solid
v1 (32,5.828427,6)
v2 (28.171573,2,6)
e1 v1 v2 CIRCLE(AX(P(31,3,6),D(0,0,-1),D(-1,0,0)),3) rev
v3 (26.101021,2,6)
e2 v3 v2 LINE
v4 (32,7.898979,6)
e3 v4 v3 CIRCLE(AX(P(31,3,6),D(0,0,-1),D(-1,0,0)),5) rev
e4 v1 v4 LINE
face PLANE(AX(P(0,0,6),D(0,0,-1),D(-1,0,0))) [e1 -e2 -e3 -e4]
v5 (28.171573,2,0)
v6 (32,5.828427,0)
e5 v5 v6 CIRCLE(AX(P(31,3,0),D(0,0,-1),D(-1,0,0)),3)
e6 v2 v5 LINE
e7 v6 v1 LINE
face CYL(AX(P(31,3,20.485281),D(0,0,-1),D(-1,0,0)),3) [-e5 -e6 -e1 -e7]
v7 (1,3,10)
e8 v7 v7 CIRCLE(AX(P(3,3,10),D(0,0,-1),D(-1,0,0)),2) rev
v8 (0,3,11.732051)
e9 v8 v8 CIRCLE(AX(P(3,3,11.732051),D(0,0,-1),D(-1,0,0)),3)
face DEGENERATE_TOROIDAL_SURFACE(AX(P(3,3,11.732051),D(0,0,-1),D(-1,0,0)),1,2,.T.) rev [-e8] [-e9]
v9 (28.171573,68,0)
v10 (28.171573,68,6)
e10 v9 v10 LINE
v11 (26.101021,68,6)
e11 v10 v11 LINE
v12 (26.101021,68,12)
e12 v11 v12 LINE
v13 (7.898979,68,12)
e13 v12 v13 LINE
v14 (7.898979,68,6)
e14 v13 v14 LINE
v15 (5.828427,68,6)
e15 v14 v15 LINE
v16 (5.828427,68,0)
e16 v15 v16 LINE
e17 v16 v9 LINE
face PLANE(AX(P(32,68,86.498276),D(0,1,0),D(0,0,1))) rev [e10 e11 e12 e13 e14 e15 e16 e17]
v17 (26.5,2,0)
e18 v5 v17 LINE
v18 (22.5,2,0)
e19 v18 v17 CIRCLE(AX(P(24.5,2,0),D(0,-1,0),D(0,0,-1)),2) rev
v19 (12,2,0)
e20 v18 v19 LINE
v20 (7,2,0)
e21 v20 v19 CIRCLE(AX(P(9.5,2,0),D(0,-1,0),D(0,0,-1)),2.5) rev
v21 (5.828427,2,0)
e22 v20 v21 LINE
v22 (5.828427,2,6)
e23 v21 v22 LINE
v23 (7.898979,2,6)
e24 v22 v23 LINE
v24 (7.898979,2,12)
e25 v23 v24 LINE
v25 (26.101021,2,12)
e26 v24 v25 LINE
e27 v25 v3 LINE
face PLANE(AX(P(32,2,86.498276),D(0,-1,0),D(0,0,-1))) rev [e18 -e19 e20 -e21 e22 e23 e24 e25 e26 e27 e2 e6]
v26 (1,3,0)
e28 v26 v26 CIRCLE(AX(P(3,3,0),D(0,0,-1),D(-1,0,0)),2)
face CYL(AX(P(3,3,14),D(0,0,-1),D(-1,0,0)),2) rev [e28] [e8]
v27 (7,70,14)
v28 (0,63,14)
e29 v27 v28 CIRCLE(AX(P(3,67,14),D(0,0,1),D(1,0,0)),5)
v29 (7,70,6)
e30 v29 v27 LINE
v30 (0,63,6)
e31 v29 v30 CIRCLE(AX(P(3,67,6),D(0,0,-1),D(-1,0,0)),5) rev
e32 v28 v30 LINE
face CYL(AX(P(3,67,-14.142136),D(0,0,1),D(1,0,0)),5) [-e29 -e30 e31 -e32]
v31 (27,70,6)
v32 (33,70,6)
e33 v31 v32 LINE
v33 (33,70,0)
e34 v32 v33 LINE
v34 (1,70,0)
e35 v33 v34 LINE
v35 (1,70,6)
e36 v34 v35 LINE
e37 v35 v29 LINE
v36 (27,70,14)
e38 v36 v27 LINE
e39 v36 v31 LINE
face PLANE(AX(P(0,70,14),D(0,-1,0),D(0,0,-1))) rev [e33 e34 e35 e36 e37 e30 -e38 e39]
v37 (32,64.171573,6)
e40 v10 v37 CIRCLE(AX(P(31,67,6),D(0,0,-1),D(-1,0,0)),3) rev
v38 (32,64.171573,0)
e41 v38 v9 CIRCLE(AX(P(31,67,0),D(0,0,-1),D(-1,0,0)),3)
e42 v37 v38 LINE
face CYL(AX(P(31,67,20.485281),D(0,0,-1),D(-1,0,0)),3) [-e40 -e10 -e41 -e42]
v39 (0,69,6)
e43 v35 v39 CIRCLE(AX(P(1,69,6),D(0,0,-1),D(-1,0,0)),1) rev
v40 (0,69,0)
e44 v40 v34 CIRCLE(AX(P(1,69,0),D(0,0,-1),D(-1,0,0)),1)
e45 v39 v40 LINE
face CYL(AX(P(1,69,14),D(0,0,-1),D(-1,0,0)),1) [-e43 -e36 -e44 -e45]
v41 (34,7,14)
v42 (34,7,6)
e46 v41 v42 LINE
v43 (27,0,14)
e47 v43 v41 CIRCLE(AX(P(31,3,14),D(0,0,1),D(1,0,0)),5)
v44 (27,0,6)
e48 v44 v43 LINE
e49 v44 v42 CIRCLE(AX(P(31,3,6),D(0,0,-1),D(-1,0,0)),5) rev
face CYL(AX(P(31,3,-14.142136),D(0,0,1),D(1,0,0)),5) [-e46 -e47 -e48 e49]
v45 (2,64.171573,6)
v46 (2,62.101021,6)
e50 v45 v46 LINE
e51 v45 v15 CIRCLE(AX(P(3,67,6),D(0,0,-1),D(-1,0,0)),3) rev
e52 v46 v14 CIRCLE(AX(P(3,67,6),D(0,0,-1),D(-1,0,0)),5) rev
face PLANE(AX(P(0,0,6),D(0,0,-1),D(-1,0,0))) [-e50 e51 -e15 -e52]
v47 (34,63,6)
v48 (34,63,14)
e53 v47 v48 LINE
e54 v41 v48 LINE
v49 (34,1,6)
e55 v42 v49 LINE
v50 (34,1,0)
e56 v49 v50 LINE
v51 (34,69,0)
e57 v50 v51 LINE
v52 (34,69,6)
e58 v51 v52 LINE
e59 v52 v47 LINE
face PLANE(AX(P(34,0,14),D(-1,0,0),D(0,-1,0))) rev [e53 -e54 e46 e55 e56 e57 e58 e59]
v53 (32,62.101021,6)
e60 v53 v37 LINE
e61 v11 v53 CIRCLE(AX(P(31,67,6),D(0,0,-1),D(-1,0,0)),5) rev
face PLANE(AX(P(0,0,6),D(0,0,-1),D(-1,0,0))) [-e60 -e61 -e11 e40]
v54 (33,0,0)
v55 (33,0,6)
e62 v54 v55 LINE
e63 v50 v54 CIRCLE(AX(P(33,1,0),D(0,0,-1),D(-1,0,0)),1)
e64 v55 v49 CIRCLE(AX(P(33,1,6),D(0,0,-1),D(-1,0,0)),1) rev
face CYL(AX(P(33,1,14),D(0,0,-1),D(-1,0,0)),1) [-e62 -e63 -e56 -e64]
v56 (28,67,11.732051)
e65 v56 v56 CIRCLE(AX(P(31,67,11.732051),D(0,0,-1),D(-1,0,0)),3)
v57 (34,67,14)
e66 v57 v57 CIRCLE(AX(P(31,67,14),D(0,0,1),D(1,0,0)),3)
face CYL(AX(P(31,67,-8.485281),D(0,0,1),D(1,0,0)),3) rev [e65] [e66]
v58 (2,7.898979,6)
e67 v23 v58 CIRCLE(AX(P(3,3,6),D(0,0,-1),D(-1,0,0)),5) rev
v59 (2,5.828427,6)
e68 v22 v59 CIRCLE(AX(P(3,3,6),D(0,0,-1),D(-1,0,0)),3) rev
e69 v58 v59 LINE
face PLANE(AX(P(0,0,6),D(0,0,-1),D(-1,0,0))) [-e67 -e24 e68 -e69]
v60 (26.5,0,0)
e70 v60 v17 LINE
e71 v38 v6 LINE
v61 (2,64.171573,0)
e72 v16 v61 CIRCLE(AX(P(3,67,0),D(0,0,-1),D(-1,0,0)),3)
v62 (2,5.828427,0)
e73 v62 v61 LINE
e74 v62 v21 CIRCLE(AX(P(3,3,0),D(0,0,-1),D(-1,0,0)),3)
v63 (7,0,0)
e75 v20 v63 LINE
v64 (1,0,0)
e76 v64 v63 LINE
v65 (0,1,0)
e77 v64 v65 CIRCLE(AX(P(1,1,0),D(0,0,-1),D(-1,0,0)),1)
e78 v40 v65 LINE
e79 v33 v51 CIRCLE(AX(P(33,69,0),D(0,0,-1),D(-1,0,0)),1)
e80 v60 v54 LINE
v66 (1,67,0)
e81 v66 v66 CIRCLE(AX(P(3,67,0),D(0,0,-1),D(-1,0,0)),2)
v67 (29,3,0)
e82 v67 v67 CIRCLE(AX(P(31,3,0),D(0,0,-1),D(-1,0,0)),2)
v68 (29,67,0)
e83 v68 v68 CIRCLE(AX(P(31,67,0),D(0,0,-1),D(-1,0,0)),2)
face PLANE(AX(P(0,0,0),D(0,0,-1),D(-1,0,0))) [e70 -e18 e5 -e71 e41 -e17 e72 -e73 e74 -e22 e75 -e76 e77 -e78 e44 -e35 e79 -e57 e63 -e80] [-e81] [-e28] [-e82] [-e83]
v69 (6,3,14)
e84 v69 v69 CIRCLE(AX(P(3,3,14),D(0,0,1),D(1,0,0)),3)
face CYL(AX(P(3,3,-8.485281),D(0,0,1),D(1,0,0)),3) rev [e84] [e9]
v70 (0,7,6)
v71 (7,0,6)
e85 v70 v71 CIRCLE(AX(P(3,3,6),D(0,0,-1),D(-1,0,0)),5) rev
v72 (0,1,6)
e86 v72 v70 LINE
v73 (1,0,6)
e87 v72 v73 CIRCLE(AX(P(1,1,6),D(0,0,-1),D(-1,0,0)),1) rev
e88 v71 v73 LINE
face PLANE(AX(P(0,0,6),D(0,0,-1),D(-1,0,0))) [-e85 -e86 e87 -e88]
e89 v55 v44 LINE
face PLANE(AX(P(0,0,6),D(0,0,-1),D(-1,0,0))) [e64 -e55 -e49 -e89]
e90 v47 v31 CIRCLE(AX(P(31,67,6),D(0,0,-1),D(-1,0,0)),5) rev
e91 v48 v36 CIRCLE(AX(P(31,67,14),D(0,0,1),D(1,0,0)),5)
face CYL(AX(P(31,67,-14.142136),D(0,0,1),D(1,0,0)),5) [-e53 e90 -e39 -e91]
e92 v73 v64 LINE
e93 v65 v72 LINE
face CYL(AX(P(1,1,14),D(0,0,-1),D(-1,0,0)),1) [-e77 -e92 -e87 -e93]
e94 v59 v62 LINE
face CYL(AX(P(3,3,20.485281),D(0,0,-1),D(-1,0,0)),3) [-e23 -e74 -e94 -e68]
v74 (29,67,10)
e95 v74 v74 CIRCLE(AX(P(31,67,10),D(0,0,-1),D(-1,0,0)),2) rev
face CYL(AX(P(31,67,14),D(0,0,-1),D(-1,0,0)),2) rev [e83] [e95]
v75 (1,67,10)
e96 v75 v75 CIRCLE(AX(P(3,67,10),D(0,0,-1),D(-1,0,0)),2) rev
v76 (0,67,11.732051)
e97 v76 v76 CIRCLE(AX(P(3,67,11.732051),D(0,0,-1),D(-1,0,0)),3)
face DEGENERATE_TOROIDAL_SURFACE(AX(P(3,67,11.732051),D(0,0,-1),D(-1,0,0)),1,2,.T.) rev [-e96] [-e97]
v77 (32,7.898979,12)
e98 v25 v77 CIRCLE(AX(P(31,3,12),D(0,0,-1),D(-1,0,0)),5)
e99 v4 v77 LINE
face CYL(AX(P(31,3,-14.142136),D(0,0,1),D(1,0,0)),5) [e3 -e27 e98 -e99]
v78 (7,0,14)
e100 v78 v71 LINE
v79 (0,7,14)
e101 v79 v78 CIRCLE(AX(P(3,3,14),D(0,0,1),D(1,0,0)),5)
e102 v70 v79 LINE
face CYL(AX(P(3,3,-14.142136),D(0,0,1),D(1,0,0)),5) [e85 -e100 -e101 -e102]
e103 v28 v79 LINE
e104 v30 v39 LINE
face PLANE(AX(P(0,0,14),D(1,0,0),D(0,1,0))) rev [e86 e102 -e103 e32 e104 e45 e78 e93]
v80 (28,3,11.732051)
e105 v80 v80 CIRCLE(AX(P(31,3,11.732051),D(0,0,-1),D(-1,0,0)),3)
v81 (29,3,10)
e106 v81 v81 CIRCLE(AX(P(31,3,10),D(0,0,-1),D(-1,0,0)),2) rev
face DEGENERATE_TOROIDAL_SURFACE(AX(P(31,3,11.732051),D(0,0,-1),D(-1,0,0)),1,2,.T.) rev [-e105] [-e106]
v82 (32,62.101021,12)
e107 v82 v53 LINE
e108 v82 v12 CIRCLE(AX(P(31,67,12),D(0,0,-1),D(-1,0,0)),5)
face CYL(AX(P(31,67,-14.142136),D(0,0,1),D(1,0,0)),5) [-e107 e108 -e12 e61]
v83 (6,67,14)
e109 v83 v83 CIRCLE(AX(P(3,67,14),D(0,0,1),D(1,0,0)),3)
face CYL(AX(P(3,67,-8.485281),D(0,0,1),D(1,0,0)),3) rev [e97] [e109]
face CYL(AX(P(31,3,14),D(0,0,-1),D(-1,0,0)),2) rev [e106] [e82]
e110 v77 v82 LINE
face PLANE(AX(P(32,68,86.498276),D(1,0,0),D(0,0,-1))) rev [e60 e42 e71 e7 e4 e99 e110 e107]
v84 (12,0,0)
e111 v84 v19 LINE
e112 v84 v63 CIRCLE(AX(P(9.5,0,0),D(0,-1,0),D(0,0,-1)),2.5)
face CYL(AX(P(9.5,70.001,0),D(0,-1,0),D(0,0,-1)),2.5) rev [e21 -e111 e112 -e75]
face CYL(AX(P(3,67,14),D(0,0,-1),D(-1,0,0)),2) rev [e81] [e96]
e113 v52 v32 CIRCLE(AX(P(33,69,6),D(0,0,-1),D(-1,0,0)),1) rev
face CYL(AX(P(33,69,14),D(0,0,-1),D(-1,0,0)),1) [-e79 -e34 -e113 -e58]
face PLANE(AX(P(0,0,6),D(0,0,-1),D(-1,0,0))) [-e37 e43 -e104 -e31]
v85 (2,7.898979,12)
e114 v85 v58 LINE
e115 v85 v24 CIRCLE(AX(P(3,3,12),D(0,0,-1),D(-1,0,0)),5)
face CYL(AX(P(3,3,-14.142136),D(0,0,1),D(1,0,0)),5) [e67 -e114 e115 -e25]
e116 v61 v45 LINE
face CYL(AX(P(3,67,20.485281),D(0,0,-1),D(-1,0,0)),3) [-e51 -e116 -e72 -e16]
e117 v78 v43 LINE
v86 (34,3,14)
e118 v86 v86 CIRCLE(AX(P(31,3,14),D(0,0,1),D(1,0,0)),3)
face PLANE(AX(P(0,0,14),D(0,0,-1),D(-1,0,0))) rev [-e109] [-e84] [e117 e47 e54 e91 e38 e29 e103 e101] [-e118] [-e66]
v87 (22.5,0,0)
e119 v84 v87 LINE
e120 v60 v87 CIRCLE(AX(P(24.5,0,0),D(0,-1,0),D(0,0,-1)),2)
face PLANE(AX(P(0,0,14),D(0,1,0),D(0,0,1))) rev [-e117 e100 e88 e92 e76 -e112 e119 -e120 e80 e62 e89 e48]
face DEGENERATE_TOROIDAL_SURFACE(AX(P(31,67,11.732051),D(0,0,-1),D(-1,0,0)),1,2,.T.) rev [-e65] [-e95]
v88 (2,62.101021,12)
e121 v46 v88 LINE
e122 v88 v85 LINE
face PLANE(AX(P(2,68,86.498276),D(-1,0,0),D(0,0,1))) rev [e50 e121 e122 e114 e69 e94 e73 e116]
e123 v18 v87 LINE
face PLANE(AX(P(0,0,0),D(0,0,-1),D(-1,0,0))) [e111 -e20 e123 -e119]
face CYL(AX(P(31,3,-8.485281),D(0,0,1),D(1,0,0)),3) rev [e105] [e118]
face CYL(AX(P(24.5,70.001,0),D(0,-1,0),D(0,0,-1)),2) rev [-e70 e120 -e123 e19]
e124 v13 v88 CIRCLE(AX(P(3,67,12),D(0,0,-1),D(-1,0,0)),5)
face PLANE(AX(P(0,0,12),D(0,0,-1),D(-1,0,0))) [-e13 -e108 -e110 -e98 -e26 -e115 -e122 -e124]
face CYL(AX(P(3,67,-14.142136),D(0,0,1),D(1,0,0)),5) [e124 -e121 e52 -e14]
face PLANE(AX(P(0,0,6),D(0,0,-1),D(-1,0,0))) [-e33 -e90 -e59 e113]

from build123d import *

# Parameters (mm, degrees)
SKETCH1_W           = 34
SKETCH1_H           = 70
BOSS_EXTRUDE1_DEPTH = 14
SKETCH2_W           = 30
SKETCH2_H           = 66
CUT_EXTRUDE1_DEPTH  = 12
SKETCH3_R           = 3
BOSS_EXTRUDE2_DEPTH = 12
SKETCH4_R           = 2
CUT_EXTRUDE2_DEPTH  = 80.069589603
CUT_EXTRUDE4_REACH  = 81.07
SKETCH6_R           = 2.5
SKETCH6_R_2         = 2
FILLET1_R           = 1
BOSS_EXTRUDE3_START = -8
SKETCH7_R           = 5
SKETCH7_R_2         = 3
BOSS_EXTRUDE3_DEPTH = 8
CUT_EXTRUDE7_START  = -4
SKETCH8_R           = 3
CUT_EXTRUDE7_DEPTH  = 4
FILLET2_R           = 2


with BuildPart() as part:
    # Sketch1 → Boss-Extrude1 (new body)
    with BuildSketch(Plane.XY):
        with Locations((17, 35)):
            Rectangle(SKETCH1_W, SKETCH1_H)
    extrude(amount=BOSS_EXTRUDE1_DEPTH)

    # Sketch2 → Cut-Extrude1 (cut)
    with BuildSketch(Plane(origin=(0, 0, 0), x_dir=(-1, 0, 0), z_dir=(0, 0, -1))):
        with Locations((-17, 35)):
            Rectangle(SKETCH2_W, SKETCH2_H)
    extrude(amount=-CUT_EXTRUDE1_DEPTH, mode=Mode.SUBTRACT)

    # Sketch3 → Boss-Extrude2 (add)
    with BuildSketch(Plane(origin=(0, 0, 0), x_dir=(-1, 0, 0), z_dir=(0, 0, -1))):
        with Locations((-31, 67)):
            Circle(SKETCH3_R)
        with Locations((-3, 67)):
            Circle(SKETCH3_R)
        with Locations((-3, 3)):
            Circle(SKETCH3_R)
        with Locations((-31, 3)):
            Circle(SKETCH3_R)
    extrude(amount=-BOSS_EXTRUDE2_DEPTH)

    # Sketch4 → Cut-Extrude2 (cut, through all)
    with BuildSketch(Plane(origin=(0, 0, 0), x_dir=(-1, 0, 0), z_dir=(0, 0, -1))):
        with Locations((-3, 67)):
            Circle(SKETCH4_R)
        with Locations((-31, 67)):
            Circle(SKETCH4_R)
        with Locations((-3, 3)):
            Circle(SKETCH4_R)
        with Locations((-31, 3)):
            Circle(SKETCH4_R)
    extrude(amount=-CUT_EXTRUDE2_DEPTH, mode=Mode.SUBTRACT)

    # Sketch6 → Cut-Extrude4 (cut, up to next)
    with BuildSketch(Plane.XZ, mode=Mode.PRIVATE) as cut_extrude4_sk1:
        with Locations((9.5, 0)):
            Circle(SKETCH6_R)
    cut_extrude4_tool1 = extrude(cut_extrude4_sk1.sketch, amount=-CUT_EXTRUDE4_REACH, mode=Mode.PRIVATE) & part.part
    # Sketch6 → Cut-Extrude4 (cut, up to next)
    with BuildSketch(Plane.XZ, mode=Mode.PRIVATE) as cut_extrude4_sk2:
        with Locations((24.5, 0)):
            Circle(SKETCH6_R_2)
    cut_extrude4_tool2 = extrude(cut_extrude4_sk2.sketch, amount=-CUT_EXTRUDE4_REACH, mode=Mode.PRIVATE) & part.part
    add(cut_extrude4_tool1.solids().sort_by_distance((9.5, 0, 0))[0], mode=Mode.SUBTRACT)
    add(cut_extrude4_tool2.solids().sort_by_distance((24.5, 0, 0))[0], mode=Mode.SUBTRACT)

    # Fillet1
    fillet1_edges = [part.edges().sort_by_distance(p)[0] for p in [
        (0, 70, 7),
        (34, 70, 7),
        (34, 0, 7),
        (0, 0, 7),
    ]]
    fillet(fillet1_edges, radius=FILLET1_R)

    # Sketch7 → Boss-Extrude3 (add)
    # profile 1 of 4: a face of its own
    with BuildSketch(Plane.XY.offset(14).offset(BOSS_EXTRUDE3_START)):
        with Locations((31, 67)):
            Circle(SKETCH7_R)
        with Locations((31, 67)):
            Circle(SKETCH7_R_2, mode=Mode.SUBTRACT)
    # profile 2 of 4: a face of its own
    with BuildSketch(Plane.XY.offset(14).offset(BOSS_EXTRUDE3_START)):
        with Locations((3, 67)):
            Circle(SKETCH7_R)
        with Locations((3, 67)):
            Circle(SKETCH7_R_2, mode=Mode.SUBTRACT)
    # profile 3 of 4: a face of its own
    with BuildSketch(Plane.XY.offset(14).offset(BOSS_EXTRUDE3_START)):
        with Locations((31, 3)):
            Circle(SKETCH7_R)
        with Locations((31, 3)):
            Circle(SKETCH7_R_2, mode=Mode.SUBTRACT)
    # profile 4 of 4: a face of its own
    with BuildSketch(Plane.XY.offset(14).offset(BOSS_EXTRUDE3_START)):
        with Locations((3, 3)):
            Circle(SKETCH7_R)
        with Locations((3, 3)):
            Circle(SKETCH7_R_2, mode=Mode.SUBTRACT)
    extrude(amount=BOSS_EXTRUDE3_DEPTH)

    # Sketch8 → Cut-Extrude7 (cut)
    with BuildSketch(Plane.XY.offset(14).offset(CUT_EXTRUDE7_START)):
        with Locations((3, 3)):
            Circle(SKETCH8_R)
        with Locations((31, 3)):
            Circle(SKETCH8_R)
        with Locations((31, 67)):
            Circle(SKETCH8_R)
        with Locations((3, 67)):
            Circle(SKETCH8_R)
    extrude(amount=CUT_EXTRUDE7_DEPTH, mode=Mode.SUBTRACT)

    # Fillet2
    # the kernel refuses this fillet: 2 mm, written as the material it adds along each edge
    with BuildSketch(Plane(origin=(3, 67, 10), x_dir=(1, 0, 0), z_dir=(0, -1, 0))) as fillet2_piece_1_section:
        with BuildLine():
            CenterArc((1, 1.732050808), FILLET2_R, 300, 60)
            Line((2, 0), (2.02, -0.034641016))
            ThreePointArc((2.02, -0.034641016), (2.5, -0.04), (3, -0.04))
            Line((3, -0.04), (3.04, 0))
            Line((3.04, 0), (3.04, 1.732050808))
            Line((3.04, 1.732050808), (3, 1.732050808))
        make_face()
    fillet2_piece_1 = revolve(axis=Axis((3, 67, 10), (0, 0, 1)), mode=Mode.PRIVATE)
    fillet2_piece_1 = fillet2_piece_1 - Plane(origin=(3, 67, 10.721085361), x_dir=(-1, 0, 0), z_dir=(0, 0, -1)) * Cylinder(2, 13, mode=Mode.PRIVATE)
    add(fillet2_piece_1)
    with BuildSketch(Plane(origin=(31, 67, 10), x_dir=(1, 0, 0), z_dir=(0, -1, 0))) as fillet2_piece_2_section:
        with BuildLine():
            CenterArc((1, 1.732050808), FILLET2_R, 300, 60)
            Line((2, 0), (2.02, -0.034641016))
            ThreePointArc((2.02, -0.034641016), (2.5, -0.04), (3, -0.04))
            Line((3, -0.04), (3.04, 0))
            Line((3.04, 0), (3.04, 1.732050808))
            Line((3.04, 1.732050808), (3, 1.732050808))
        make_face()
    fillet2_piece_2 = revolve(axis=Axis((31, 67, 10), (0, 0, 1)), mode=Mode.PRIVATE)
    fillet2_piece_2 = fillet2_piece_2 - Plane(origin=(31, 67, 10.721085361), x_dir=(-1, 0, 0), z_dir=(0, 0, -1)) * Cylinder(2, 13, mode=Mode.PRIVATE)
    add(fillet2_piece_2)
    with BuildSketch(Plane(origin=(31, 3, 10), x_dir=(1, 0, 0), z_dir=(0, -1, 0))) as fillet2_piece_3_section:
        with BuildLine():
            CenterArc((1, 1.732050808), FILLET2_R, 300, 60)
            Line((2, 0), (2.02, -0.034641016))
            ThreePointArc((2.02, -0.034641016), (2.5, -0.04), (3, -0.04))
            Line((3, -0.04), (3.04, 0))
            Line((3.04, 0), (3.04, 1.732050808))
            Line((3.04, 1.732050808), (3, 1.732050808))
        make_face()
    fillet2_piece_3 = revolve(axis=Axis((31, 3, 10), (0, 0, 1)), mode=Mode.PRIVATE)
    fillet2_piece_3 = fillet2_piece_3 - Plane(origin=(31, 3, 10.721085361), x_dir=(-1, 0, 0), z_dir=(0, 0, -1)) * Cylinder(2, 13, mode=Mode.PRIVATE)
    add(fillet2_piece_3)
    with BuildSketch(Plane(origin=(3, 3, 10), x_dir=(1, 0, 0), z_dir=(0, -1, 0))) as fillet2_piece_4_section:
        with BuildLine():
            CenterArc((1, 1.732050808), FILLET2_R, 300, 60)
            Line((2, 0), (2.02, -0.034641016))
            ThreePointArc((2.02, -0.034641016), (2.5, -0.04), (3, -0.04))
            Line((3, -0.04), (3.04, 0))
            Line((3.04, 0), (3.04, 1.732050808))
            Line((3.04, 1.732050808), (3, 1.732050808))
        make_face()
    fillet2_piece_4 = revolve(axis=Axis((3, 3, 10), (0, 0, 1)), mode=Mode.PRIVATE)
    fillet2_piece_4 = fillet2_piece_4 - Plane(origin=(3, 3, 10.721085361), x_dir=(-1, 0, 0), z_dir=(0, 0, -1)) * Cylinder(2, 13, mode=Mode.PRIVATE)
    add(fillet2_piece_4)


solid = part.part
